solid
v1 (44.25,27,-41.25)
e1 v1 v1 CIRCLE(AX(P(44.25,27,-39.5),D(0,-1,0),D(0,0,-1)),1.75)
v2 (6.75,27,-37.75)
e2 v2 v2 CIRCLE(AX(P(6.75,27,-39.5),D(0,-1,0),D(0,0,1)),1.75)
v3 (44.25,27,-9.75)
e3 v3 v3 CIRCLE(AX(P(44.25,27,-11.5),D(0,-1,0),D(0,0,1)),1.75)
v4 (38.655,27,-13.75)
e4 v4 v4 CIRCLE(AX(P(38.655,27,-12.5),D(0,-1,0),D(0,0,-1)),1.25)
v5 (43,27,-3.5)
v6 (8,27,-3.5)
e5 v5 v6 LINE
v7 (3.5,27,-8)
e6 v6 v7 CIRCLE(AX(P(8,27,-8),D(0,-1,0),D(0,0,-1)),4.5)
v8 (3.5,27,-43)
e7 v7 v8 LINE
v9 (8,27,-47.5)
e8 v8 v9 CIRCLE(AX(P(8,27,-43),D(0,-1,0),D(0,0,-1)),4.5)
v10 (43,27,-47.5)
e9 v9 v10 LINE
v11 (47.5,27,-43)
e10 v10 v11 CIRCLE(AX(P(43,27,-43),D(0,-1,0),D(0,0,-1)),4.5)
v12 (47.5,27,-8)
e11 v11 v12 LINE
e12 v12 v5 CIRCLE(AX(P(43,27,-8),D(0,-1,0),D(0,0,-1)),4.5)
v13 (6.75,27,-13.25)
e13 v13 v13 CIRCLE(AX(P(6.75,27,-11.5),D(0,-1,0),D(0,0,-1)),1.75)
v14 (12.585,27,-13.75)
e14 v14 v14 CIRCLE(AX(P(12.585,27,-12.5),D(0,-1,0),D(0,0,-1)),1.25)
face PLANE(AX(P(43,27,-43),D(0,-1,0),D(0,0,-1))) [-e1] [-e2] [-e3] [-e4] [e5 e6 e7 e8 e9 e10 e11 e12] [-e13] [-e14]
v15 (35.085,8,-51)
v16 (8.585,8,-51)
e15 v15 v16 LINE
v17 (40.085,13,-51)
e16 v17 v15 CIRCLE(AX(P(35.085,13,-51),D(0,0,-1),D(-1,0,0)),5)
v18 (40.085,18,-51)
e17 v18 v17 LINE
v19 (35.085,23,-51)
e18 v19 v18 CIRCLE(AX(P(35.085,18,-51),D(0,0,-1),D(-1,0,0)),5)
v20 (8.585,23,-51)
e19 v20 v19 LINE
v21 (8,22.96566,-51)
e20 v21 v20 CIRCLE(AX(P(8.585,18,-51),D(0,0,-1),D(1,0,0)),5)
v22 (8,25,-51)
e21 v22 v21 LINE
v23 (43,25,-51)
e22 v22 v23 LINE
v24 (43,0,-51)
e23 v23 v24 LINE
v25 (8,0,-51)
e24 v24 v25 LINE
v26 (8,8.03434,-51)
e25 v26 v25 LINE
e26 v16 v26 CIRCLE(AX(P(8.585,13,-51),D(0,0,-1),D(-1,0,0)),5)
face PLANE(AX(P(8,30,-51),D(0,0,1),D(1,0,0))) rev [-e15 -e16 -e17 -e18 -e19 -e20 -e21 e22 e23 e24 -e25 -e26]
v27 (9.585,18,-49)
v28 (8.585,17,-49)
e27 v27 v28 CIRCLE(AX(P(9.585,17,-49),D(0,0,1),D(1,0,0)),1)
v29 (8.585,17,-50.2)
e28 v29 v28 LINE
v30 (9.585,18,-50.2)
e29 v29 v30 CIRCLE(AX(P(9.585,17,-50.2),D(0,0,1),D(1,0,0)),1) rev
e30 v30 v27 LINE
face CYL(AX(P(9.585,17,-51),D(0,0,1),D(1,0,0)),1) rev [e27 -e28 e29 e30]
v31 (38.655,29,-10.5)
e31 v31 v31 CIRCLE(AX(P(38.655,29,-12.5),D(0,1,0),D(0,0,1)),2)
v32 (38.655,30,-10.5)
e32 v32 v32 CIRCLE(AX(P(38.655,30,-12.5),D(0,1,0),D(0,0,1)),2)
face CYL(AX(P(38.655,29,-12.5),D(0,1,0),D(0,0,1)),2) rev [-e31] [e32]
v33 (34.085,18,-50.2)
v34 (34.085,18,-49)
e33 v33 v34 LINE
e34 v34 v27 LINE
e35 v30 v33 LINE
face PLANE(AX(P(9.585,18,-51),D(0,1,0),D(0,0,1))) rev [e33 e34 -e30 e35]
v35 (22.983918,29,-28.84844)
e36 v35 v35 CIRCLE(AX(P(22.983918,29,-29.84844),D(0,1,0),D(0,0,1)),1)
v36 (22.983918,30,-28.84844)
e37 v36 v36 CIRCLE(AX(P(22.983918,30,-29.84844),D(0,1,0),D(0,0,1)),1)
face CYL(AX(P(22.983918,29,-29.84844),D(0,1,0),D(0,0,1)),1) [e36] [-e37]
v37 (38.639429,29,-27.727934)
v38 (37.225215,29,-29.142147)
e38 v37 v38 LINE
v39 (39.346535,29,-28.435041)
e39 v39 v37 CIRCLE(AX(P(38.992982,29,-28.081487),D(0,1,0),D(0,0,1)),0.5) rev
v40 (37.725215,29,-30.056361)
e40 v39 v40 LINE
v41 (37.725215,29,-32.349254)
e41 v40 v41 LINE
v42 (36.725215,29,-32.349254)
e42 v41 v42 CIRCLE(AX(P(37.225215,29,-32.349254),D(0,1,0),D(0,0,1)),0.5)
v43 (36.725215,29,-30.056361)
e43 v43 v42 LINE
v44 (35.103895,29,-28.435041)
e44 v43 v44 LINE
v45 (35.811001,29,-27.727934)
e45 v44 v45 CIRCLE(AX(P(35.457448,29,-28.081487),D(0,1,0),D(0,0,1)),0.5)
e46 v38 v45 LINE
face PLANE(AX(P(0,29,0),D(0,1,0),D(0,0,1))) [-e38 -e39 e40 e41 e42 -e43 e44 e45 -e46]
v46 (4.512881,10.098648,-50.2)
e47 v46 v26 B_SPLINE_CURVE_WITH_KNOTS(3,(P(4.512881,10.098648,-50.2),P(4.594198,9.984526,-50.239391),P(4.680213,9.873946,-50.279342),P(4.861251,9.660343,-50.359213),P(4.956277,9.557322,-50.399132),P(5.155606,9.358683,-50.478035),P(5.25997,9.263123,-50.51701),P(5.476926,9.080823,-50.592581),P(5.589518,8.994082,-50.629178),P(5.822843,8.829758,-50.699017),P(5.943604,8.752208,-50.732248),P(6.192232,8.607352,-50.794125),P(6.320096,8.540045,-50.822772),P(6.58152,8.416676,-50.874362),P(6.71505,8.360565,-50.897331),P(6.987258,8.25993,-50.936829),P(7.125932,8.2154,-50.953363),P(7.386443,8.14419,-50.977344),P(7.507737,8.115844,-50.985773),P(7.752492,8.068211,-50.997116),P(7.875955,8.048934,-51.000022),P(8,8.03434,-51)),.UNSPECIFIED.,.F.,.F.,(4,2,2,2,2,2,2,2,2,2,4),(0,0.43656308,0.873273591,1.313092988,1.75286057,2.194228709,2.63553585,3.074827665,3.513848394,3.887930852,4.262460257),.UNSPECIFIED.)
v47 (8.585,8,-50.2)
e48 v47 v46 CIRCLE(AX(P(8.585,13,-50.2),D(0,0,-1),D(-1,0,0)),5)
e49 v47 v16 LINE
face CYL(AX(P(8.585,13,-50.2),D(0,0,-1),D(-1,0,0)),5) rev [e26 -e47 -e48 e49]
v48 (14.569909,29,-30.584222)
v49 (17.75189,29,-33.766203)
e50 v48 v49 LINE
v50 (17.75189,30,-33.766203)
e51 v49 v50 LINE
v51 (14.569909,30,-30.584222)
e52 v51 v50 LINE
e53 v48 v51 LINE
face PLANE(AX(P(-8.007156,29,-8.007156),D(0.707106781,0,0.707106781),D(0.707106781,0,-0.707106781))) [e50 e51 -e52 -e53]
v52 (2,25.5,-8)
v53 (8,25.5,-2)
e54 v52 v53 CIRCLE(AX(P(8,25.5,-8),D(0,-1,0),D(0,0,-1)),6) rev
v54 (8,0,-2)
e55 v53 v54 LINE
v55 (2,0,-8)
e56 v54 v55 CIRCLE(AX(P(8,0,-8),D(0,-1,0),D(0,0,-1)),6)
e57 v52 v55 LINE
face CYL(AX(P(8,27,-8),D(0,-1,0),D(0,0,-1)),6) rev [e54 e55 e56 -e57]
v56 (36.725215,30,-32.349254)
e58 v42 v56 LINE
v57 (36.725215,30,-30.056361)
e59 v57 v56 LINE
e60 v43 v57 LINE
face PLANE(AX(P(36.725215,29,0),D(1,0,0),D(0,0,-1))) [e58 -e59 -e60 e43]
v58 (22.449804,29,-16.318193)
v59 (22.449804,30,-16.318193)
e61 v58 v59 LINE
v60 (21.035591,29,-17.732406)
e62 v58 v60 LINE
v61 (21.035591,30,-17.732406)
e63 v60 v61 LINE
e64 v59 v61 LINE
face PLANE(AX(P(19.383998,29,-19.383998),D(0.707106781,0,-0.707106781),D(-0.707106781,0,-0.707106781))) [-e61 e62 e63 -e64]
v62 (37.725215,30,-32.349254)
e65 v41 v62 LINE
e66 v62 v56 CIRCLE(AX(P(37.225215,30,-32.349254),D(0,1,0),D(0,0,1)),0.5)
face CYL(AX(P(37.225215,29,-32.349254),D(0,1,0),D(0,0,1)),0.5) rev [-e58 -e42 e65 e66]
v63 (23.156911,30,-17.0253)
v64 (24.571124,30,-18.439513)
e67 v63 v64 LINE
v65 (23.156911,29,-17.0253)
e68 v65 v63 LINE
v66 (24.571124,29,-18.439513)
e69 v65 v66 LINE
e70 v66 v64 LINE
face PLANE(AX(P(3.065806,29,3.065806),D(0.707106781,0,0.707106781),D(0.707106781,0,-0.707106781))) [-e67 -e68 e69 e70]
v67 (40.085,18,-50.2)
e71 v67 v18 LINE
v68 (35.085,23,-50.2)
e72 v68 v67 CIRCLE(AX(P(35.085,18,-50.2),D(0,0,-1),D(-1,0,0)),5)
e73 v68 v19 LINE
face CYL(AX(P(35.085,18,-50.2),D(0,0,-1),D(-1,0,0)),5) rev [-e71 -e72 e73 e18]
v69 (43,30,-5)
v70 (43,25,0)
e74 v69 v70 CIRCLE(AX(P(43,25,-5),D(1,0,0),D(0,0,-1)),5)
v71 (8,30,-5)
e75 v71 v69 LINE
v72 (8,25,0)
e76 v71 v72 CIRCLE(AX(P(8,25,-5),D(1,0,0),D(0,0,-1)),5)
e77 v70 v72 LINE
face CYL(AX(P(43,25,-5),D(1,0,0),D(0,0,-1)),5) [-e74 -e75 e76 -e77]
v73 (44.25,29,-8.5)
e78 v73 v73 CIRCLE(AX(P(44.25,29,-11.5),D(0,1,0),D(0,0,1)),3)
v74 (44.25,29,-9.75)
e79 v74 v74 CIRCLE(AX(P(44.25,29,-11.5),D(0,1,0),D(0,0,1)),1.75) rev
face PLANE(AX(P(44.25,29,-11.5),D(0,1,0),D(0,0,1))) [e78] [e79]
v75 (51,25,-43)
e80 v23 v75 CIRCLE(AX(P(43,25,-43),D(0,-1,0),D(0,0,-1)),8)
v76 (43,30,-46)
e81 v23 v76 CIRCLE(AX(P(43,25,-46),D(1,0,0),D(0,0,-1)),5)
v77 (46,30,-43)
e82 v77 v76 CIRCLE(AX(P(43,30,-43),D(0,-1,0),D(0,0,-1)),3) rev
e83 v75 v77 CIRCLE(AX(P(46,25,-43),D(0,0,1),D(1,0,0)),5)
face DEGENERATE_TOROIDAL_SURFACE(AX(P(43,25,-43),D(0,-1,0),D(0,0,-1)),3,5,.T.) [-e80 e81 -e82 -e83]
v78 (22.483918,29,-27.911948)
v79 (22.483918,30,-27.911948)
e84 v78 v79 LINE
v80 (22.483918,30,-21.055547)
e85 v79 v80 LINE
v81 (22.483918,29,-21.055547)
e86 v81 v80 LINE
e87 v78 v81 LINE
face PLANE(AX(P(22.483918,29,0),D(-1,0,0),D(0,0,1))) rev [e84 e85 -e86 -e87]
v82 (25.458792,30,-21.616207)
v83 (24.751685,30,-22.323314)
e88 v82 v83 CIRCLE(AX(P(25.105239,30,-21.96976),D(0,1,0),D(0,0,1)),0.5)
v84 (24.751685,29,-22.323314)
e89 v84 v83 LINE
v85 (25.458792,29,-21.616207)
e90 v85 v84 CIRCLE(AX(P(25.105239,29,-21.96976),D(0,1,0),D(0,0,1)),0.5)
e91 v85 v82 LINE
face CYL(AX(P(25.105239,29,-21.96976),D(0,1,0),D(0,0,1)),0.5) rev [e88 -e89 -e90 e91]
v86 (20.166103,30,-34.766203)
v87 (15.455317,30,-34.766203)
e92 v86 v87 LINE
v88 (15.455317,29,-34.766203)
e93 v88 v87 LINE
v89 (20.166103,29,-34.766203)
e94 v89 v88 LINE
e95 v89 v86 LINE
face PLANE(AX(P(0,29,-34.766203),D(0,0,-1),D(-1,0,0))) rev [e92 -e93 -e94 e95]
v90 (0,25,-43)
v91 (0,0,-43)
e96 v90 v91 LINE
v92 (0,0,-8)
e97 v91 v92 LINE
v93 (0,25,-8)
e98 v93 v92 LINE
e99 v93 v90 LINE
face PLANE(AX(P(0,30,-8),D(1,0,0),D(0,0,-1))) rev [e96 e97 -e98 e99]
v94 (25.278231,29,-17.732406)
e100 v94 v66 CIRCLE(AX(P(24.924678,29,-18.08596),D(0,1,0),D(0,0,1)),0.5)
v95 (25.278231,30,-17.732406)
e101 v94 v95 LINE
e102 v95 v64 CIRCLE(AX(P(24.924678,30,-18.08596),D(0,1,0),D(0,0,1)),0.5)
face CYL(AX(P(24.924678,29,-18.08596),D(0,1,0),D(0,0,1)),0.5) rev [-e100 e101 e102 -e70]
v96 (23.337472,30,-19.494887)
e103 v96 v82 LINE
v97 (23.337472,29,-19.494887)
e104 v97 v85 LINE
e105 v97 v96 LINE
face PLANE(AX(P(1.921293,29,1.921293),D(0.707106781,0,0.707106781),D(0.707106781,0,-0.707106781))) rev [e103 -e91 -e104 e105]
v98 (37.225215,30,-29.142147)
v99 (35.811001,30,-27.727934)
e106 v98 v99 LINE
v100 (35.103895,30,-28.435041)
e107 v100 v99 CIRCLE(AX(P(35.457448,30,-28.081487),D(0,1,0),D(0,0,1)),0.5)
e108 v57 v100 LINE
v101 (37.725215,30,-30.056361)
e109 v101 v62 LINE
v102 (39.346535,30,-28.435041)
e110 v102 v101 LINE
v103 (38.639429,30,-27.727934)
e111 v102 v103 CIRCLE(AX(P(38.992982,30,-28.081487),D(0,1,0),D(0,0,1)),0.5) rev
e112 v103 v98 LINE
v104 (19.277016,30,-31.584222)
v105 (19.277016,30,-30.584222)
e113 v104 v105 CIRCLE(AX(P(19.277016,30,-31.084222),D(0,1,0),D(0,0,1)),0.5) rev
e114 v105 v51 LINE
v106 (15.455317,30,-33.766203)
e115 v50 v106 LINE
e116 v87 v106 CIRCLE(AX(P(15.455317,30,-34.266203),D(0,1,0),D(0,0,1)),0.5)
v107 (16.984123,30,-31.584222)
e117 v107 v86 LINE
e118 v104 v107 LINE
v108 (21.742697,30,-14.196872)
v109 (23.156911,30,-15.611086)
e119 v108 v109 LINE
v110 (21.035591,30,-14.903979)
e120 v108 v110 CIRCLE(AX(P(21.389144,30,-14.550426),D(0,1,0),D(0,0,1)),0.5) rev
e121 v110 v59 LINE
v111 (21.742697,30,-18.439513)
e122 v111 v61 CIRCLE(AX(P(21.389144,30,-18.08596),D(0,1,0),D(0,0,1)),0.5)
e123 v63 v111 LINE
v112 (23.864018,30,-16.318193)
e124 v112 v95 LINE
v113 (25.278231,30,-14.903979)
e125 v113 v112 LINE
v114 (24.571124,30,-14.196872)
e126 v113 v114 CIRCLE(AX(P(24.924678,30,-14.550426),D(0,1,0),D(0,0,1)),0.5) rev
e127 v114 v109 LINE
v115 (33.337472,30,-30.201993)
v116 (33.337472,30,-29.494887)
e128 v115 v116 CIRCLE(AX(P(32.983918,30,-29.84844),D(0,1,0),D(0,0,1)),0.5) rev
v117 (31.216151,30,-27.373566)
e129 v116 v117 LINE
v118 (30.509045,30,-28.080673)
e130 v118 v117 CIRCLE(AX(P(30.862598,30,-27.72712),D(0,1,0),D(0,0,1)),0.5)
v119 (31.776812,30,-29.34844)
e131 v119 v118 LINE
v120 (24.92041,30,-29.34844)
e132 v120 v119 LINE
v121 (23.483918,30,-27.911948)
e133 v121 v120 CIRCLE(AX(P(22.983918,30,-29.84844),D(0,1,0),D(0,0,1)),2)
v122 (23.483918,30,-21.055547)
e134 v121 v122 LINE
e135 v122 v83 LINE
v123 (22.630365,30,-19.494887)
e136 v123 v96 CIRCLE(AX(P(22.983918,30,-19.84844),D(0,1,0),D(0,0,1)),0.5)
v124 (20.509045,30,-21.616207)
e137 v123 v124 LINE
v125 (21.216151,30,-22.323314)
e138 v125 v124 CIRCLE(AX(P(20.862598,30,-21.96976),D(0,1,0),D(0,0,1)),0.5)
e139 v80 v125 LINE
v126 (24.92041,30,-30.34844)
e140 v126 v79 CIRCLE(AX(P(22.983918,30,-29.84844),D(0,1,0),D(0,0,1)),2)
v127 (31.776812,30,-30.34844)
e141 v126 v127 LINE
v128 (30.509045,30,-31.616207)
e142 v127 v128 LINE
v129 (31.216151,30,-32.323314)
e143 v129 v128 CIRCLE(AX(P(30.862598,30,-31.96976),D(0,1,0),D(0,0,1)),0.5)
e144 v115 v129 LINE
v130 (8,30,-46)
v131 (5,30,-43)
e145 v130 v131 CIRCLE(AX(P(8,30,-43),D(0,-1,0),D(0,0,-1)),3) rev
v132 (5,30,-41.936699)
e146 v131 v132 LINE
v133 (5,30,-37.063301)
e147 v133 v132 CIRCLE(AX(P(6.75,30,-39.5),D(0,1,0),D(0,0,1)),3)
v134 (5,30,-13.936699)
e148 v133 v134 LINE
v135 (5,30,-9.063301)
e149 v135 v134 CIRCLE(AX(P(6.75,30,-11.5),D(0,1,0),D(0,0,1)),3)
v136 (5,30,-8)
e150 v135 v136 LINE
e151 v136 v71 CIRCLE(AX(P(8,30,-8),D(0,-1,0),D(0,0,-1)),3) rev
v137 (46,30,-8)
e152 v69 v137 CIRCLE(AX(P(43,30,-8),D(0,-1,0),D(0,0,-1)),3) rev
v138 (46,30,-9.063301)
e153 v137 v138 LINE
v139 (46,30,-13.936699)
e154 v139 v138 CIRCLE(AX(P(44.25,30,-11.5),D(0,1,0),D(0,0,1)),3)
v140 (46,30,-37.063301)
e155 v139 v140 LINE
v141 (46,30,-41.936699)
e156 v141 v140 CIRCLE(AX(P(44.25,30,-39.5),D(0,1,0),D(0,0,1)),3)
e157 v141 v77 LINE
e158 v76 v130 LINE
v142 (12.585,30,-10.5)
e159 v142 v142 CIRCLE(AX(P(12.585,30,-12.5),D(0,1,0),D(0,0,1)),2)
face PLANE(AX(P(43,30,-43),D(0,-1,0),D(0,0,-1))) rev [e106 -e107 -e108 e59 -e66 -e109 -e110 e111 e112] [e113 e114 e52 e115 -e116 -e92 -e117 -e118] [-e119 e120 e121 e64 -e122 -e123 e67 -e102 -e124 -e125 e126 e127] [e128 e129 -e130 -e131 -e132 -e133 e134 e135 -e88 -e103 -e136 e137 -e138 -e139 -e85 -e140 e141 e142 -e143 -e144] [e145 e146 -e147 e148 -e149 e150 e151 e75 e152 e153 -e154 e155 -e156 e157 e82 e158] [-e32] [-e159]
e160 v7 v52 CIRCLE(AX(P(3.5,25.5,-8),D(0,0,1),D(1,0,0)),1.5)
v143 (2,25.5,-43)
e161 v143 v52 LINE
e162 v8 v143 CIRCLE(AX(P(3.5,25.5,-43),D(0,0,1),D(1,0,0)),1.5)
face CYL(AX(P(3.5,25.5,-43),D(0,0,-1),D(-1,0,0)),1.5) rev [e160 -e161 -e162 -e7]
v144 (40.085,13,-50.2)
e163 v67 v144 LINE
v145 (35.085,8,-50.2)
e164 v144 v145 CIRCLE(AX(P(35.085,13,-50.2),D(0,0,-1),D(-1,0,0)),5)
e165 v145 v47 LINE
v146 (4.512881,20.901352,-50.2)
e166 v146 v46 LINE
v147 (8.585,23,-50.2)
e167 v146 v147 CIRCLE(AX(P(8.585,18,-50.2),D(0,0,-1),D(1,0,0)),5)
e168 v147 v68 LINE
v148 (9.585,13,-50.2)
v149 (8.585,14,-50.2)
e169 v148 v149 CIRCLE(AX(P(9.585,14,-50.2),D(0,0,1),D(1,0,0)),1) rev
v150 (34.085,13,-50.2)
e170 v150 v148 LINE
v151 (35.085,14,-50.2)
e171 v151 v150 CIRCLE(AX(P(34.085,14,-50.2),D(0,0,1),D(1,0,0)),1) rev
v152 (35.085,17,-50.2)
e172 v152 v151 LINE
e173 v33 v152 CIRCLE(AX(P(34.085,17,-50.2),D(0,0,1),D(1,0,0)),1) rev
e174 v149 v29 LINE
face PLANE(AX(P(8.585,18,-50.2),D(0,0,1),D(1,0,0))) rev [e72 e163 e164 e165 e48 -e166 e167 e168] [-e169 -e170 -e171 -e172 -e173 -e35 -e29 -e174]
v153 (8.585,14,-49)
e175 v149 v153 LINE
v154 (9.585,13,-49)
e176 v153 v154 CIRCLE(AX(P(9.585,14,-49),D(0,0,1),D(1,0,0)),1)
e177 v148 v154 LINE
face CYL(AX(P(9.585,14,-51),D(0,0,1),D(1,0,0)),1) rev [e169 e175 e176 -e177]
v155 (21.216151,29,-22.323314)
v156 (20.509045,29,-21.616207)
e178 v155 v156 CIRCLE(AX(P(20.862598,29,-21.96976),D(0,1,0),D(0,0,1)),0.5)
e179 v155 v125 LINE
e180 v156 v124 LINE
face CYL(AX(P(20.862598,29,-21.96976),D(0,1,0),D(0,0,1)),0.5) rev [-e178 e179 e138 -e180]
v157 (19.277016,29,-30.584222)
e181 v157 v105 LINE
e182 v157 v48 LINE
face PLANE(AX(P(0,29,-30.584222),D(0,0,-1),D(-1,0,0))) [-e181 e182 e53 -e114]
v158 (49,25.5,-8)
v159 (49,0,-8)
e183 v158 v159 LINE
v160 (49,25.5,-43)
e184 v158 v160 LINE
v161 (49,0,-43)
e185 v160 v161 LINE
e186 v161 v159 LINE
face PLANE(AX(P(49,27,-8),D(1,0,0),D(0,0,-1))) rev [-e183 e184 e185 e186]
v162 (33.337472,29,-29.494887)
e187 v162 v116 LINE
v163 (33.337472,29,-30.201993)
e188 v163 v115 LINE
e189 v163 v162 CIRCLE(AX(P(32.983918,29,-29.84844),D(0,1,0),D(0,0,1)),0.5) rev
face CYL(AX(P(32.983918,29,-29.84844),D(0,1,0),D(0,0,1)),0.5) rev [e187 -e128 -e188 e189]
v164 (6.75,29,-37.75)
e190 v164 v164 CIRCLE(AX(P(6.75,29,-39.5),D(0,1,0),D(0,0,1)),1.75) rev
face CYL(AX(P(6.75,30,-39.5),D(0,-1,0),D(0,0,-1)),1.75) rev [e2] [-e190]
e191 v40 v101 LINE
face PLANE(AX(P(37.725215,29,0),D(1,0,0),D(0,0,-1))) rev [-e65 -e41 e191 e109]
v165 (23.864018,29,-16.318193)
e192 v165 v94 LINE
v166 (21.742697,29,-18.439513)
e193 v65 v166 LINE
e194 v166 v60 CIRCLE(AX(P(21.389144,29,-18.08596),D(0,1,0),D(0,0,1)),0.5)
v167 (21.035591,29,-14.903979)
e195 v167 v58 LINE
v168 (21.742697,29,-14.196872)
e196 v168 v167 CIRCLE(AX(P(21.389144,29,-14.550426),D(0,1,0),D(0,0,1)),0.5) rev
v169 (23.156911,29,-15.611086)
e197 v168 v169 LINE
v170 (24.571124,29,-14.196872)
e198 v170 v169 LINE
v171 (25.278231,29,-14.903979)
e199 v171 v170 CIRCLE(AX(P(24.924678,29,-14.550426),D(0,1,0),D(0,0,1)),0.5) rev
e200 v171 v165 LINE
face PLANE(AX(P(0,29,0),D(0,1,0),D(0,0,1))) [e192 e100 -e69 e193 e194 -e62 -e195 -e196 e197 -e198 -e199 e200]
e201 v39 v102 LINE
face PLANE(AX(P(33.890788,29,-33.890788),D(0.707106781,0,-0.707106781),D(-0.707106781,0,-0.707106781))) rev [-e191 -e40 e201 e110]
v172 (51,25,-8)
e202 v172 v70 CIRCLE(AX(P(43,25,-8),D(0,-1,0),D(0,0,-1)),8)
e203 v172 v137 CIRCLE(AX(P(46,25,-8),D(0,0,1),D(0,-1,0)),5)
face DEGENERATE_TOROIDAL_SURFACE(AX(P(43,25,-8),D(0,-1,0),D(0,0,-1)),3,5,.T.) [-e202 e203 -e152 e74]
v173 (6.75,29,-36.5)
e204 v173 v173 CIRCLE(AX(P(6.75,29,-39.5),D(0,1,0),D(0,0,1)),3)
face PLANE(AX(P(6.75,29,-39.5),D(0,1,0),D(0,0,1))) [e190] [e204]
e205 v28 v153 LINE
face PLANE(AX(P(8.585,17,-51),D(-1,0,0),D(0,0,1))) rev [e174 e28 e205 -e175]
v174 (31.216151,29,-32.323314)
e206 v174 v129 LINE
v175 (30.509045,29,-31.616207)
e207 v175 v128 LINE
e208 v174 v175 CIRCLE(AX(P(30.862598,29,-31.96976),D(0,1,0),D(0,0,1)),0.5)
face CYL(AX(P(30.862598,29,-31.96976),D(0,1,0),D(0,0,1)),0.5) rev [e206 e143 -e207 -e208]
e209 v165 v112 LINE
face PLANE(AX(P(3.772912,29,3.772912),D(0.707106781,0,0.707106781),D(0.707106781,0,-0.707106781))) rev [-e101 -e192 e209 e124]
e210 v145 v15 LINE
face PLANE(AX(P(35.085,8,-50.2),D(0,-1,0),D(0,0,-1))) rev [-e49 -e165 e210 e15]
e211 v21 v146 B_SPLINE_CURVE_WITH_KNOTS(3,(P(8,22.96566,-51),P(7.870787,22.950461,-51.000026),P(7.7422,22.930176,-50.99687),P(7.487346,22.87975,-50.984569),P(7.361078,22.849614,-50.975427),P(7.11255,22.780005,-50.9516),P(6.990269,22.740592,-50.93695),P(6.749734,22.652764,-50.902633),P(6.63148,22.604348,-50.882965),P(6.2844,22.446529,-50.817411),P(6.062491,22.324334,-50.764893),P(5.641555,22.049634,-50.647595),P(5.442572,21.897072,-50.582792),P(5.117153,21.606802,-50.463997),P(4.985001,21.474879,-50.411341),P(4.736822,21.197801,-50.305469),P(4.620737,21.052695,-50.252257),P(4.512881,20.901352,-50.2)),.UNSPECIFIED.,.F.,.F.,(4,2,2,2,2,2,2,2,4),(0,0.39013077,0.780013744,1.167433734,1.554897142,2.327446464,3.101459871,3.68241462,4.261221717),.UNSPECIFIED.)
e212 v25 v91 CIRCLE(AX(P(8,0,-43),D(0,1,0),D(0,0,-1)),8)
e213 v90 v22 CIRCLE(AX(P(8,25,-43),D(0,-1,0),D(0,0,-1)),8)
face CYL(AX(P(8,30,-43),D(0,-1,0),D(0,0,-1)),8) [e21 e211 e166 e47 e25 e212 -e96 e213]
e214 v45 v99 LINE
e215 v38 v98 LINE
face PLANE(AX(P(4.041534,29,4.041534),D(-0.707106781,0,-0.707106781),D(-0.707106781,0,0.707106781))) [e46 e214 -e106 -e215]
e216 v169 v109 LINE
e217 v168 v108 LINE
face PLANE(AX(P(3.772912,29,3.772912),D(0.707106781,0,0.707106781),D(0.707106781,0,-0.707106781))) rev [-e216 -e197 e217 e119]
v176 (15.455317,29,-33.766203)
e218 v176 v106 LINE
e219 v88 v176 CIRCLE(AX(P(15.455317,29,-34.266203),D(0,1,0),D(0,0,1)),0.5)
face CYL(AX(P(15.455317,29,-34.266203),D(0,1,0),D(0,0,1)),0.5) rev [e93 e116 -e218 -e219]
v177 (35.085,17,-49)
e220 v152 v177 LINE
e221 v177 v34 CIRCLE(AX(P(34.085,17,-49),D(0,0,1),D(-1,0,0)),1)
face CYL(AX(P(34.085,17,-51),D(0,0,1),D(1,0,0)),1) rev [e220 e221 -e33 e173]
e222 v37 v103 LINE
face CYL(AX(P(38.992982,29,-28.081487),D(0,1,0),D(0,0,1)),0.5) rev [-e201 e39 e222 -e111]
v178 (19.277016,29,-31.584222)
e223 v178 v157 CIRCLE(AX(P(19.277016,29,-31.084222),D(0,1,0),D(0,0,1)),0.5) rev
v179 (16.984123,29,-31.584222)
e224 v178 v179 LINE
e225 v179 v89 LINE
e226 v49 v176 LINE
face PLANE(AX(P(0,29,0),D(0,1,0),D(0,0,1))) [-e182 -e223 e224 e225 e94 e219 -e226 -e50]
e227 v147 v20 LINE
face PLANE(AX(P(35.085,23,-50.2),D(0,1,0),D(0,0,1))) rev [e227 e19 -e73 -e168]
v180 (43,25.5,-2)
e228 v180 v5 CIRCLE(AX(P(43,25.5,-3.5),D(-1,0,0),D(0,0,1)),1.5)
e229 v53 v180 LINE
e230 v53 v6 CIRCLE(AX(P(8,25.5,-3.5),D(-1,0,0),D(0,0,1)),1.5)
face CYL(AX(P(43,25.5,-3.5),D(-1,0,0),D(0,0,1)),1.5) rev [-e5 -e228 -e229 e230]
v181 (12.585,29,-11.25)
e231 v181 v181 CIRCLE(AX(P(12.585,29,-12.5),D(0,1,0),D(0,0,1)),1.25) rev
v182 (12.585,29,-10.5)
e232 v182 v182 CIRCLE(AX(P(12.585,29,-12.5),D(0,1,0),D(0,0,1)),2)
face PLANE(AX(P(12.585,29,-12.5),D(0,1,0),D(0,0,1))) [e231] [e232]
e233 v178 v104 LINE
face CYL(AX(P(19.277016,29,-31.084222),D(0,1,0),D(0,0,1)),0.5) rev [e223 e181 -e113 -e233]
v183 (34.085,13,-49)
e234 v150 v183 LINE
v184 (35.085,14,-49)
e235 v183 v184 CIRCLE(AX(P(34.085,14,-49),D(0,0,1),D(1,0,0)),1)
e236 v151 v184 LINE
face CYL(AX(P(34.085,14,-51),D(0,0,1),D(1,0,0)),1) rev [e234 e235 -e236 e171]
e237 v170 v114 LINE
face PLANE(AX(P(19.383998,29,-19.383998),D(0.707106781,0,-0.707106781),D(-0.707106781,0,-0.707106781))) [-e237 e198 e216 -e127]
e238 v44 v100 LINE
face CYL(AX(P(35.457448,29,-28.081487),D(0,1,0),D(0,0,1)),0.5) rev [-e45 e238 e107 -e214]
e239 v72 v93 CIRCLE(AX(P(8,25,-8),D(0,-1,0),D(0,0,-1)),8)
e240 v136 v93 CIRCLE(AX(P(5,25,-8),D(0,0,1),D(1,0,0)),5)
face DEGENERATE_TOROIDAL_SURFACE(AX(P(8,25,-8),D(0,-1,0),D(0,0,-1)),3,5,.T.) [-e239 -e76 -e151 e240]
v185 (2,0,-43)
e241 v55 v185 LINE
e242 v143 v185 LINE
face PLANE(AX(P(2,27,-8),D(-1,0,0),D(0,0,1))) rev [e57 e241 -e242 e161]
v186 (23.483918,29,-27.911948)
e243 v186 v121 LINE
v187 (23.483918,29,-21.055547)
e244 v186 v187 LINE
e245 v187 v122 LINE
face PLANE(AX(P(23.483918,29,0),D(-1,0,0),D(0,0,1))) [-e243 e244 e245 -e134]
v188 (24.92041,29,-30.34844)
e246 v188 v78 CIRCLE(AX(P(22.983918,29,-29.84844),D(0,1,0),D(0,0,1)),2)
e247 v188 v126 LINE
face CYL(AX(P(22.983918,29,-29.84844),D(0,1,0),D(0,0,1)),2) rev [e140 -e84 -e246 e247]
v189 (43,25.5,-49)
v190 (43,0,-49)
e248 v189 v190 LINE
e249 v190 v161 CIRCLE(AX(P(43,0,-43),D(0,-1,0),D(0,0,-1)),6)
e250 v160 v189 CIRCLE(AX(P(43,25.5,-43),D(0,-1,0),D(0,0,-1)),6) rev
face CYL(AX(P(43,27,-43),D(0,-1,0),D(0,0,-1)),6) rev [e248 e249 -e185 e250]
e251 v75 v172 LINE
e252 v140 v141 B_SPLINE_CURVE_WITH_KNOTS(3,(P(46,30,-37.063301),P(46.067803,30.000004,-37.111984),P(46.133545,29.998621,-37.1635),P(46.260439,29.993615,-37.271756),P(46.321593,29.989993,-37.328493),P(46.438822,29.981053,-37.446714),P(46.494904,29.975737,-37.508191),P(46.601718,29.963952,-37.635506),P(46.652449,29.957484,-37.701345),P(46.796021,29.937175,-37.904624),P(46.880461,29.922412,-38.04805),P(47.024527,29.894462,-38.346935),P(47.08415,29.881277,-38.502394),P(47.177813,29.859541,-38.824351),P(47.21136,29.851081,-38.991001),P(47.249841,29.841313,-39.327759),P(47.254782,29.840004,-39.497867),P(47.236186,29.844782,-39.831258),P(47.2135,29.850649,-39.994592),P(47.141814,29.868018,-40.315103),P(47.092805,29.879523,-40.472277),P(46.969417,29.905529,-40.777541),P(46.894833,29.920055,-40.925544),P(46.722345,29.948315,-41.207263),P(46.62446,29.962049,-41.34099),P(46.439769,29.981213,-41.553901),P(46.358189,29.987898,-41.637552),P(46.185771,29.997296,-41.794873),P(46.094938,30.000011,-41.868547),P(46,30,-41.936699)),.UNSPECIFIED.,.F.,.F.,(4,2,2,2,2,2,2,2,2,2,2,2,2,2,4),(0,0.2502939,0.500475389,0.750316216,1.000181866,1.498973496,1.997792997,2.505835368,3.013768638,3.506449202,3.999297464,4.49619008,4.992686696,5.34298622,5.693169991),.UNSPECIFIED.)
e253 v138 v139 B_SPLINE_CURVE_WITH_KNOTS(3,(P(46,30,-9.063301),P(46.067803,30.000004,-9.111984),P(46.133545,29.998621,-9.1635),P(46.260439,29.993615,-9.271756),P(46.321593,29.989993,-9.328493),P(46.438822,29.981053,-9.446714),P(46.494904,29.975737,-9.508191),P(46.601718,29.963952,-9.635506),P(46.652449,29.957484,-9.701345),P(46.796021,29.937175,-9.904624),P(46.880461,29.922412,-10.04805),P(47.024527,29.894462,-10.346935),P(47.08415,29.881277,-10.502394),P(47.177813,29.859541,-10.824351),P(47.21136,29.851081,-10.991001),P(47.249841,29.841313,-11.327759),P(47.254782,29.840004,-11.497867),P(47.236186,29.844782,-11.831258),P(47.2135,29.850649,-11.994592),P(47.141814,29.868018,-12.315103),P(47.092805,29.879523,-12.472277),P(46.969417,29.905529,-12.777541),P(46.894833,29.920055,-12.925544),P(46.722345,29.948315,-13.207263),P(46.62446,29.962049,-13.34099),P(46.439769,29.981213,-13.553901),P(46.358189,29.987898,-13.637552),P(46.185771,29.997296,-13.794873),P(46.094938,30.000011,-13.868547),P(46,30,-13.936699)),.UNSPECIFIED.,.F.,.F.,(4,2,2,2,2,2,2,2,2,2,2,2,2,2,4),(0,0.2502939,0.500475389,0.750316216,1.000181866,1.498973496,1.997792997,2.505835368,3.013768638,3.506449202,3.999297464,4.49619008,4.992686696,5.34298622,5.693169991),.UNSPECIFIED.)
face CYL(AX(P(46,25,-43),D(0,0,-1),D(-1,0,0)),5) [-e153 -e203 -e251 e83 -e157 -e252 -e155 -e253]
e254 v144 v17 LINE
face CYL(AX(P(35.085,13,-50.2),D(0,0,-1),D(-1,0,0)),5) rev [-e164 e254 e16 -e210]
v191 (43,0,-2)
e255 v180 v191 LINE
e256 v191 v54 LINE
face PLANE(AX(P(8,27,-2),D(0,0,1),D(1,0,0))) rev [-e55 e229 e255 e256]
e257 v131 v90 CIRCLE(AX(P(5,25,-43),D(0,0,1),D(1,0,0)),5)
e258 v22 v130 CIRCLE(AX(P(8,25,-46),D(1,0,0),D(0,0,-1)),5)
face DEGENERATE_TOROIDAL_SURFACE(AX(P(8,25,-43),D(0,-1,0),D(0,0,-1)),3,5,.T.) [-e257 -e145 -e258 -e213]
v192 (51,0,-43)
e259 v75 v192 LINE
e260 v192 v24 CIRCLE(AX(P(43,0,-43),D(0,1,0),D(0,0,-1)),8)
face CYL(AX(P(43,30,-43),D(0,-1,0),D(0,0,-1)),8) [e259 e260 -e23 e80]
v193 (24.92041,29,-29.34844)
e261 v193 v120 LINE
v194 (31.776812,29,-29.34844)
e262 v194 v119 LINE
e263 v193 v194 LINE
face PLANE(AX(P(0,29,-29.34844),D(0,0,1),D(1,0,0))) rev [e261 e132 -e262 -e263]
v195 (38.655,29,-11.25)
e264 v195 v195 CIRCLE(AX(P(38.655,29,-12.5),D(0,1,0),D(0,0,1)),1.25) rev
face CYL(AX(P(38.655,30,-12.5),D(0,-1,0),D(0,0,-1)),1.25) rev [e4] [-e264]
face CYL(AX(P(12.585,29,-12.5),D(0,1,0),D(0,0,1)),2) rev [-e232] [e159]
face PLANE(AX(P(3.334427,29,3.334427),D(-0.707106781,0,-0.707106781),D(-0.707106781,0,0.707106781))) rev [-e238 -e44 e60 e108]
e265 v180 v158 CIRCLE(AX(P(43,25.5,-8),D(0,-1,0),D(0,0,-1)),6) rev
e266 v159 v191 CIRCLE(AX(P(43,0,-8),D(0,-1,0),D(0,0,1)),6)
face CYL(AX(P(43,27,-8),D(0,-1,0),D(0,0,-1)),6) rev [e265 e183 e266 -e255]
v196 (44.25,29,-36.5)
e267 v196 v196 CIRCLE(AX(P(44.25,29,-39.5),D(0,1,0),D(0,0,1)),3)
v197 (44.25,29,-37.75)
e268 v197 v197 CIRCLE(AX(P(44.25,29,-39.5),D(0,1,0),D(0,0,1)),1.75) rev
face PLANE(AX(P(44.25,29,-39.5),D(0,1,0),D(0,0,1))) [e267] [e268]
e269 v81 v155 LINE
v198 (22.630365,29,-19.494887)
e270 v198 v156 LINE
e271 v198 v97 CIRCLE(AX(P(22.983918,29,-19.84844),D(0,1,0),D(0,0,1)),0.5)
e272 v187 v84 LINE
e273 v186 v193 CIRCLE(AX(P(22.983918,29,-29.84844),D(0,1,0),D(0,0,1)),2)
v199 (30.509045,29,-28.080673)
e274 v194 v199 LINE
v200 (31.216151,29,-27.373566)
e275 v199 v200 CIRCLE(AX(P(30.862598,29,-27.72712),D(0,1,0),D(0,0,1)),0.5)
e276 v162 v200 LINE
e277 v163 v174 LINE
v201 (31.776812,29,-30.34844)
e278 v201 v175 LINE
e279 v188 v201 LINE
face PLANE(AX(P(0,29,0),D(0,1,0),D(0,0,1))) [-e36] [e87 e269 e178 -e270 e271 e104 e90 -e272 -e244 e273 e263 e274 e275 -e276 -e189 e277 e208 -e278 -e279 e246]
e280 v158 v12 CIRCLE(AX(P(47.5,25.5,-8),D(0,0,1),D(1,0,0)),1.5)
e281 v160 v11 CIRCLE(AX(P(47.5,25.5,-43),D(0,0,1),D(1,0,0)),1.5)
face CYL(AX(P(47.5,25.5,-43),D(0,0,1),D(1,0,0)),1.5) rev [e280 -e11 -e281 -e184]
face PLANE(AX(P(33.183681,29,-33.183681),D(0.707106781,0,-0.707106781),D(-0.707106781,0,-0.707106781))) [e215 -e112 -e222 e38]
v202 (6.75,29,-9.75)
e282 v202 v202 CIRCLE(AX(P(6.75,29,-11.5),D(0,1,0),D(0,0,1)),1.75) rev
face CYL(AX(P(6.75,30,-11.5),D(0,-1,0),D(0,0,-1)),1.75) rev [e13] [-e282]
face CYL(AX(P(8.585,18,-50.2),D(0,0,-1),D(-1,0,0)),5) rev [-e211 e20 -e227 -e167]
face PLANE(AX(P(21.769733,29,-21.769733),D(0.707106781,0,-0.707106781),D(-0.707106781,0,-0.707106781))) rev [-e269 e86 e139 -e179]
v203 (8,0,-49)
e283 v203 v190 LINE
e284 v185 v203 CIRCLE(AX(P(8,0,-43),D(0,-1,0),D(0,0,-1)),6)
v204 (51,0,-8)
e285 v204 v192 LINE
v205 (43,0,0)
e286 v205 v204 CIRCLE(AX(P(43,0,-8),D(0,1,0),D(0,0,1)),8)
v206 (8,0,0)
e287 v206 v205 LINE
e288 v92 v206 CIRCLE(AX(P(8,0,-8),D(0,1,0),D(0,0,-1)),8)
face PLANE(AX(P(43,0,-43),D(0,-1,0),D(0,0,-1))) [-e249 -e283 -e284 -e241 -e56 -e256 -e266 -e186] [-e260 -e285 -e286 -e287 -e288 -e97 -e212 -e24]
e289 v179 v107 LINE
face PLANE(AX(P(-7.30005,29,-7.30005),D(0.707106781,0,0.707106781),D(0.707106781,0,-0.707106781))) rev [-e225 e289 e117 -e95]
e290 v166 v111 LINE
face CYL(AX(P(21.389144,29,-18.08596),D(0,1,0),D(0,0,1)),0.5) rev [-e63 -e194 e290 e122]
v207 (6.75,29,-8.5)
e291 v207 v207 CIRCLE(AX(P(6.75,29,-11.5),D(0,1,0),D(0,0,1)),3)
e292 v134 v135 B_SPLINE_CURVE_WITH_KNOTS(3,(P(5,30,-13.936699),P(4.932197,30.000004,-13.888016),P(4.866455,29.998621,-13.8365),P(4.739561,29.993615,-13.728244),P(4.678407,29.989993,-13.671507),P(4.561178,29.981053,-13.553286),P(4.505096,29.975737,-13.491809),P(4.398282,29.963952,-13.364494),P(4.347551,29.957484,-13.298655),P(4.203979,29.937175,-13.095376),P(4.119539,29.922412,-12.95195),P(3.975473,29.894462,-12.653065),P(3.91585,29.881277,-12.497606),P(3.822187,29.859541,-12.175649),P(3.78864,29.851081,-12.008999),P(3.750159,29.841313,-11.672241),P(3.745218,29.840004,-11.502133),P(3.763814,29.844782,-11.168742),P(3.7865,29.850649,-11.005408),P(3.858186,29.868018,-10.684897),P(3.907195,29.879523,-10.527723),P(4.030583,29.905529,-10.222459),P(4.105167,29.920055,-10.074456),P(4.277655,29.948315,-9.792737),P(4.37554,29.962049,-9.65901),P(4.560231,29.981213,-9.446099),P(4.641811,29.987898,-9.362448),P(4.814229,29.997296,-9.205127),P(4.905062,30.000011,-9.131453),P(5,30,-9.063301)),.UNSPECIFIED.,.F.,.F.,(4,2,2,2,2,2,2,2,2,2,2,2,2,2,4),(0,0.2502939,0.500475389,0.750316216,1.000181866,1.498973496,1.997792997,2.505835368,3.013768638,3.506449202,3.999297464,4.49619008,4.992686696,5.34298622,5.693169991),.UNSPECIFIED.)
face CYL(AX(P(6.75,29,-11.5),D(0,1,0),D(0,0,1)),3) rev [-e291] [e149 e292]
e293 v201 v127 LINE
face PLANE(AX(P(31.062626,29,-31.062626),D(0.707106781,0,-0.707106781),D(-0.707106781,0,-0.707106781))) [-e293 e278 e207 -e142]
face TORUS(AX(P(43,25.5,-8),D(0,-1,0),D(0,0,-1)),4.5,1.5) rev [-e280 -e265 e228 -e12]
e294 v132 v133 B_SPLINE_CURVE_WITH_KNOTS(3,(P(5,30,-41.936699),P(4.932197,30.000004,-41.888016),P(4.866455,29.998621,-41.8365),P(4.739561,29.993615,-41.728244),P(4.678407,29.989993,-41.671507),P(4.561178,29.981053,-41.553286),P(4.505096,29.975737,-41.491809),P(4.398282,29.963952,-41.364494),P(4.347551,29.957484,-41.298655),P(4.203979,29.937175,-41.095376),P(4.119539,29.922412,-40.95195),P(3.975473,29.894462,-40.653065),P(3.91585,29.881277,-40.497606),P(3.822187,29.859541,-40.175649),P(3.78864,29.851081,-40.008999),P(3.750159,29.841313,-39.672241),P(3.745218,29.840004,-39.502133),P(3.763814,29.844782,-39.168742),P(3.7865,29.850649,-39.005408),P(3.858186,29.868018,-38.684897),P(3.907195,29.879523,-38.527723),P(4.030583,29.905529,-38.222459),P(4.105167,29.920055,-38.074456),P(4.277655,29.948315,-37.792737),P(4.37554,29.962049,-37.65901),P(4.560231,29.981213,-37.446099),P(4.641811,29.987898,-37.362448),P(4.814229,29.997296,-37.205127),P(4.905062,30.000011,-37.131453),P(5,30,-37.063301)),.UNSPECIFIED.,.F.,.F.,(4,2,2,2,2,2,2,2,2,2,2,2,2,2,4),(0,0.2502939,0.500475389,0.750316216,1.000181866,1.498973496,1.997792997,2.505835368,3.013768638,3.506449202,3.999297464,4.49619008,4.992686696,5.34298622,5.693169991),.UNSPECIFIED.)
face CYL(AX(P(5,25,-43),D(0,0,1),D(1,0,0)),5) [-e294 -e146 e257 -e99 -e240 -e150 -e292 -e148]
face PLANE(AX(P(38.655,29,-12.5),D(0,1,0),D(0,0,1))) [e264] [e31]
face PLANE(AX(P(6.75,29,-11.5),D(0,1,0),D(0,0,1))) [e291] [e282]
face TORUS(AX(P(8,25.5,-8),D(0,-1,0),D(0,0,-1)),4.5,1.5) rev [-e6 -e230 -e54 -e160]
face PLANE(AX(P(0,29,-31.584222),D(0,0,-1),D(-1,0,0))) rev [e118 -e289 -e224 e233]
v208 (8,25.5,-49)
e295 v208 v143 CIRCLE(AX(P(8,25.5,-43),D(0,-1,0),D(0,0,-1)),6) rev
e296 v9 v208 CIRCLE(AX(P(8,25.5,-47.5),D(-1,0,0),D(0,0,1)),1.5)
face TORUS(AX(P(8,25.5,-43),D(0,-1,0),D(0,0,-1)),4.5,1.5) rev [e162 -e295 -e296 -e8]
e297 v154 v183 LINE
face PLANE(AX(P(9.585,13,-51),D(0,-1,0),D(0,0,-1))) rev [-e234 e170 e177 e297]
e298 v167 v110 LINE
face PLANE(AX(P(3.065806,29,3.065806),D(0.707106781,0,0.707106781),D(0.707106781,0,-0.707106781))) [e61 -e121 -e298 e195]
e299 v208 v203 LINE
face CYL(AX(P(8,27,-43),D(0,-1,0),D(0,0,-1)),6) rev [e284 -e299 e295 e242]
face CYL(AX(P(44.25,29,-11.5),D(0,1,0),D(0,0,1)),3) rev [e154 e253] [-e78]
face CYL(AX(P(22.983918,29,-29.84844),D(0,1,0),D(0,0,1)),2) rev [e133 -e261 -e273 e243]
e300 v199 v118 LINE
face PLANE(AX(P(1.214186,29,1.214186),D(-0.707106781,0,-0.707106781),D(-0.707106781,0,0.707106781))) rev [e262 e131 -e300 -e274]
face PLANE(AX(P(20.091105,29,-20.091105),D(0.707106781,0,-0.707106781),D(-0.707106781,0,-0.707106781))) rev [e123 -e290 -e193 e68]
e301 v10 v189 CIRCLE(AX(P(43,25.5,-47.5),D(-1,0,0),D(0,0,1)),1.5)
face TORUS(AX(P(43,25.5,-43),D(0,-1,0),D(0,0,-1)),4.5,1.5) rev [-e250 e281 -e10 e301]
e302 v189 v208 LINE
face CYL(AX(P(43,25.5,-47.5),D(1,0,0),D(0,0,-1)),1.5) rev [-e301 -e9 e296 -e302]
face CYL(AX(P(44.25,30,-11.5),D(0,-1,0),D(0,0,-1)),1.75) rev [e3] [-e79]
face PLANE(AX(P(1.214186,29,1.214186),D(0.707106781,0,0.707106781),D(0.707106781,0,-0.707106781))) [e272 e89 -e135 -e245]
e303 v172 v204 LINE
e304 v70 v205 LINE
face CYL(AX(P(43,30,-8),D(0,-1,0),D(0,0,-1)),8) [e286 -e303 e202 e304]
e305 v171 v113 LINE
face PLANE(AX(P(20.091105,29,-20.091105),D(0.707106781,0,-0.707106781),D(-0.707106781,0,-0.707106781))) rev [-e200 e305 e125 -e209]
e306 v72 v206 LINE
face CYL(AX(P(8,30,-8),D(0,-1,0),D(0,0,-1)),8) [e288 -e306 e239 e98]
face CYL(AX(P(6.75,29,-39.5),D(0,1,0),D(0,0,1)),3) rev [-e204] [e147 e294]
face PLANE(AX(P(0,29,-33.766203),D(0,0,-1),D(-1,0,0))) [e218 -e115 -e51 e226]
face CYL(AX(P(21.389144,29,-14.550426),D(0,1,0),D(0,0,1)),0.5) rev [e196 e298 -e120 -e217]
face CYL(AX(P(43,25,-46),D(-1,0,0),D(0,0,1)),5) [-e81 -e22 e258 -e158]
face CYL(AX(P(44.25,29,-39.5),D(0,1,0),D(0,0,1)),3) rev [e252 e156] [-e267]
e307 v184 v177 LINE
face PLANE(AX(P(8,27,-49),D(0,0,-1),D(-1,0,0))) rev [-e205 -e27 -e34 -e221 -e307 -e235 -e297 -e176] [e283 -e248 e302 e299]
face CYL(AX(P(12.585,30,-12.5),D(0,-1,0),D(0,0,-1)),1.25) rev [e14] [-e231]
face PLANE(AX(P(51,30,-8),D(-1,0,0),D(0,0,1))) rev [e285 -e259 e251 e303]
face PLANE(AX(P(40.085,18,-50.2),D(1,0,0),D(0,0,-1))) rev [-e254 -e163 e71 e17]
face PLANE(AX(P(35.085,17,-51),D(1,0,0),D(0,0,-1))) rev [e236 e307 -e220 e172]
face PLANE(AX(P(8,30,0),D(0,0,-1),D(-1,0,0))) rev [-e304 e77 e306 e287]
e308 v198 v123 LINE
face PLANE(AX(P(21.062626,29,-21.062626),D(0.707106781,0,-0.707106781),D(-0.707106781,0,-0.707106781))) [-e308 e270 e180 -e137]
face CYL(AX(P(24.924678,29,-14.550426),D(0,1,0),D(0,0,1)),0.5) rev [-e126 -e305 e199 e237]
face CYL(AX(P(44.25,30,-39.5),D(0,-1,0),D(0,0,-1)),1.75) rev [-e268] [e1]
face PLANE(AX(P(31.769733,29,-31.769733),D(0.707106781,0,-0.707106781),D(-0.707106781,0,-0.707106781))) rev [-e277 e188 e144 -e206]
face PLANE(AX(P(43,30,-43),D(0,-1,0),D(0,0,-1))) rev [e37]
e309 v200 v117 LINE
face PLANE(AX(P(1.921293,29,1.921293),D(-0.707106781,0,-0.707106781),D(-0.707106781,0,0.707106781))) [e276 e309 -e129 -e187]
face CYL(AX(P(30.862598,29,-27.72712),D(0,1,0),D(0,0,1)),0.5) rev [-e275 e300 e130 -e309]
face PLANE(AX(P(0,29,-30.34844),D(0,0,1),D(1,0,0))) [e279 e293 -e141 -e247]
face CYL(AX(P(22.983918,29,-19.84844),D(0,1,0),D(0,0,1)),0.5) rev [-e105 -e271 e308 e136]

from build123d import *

# Parameters (mm, degrees)
BOSS_EXTRUDE1_DEPTH = 30
CUT_EXTRUDE1_DEPTH  = 27
SKETCH3_R           = 1.75
SKETCH3_R_2         = 1.25
CUT_EXTRUDE2_DEPTH  = 3
SKETCH4_R           = 3
SKETCH4_R_2         = 2
CUT_EXTRUDE3_DEPTH  = 1
CUT_EXTRUDE4_DEPTH  = 2
FILLET1_R           = 5
FILLET2_R           = 1.5
SKETCH6_R           = 1
CUT_EXTRUDE5_DEPTH  = 1
CUT_EXTRUDE6_DEPTH  = 0.8


with BuildPart() as part:
    # Sketch1 → Boss-Extrude1 (new body)
    with BuildSketch(Plane(origin=(0, 0, 0), x_dir=(1, 0, 0), z_dir=(0, 1, 0))):
        with BuildLine():
            Line((8, 0), (43, 0))
            ThreePointArc((43, 0), (48.656854249, 2.343145751), (51, 8))
            Line((51, 8), (51, 43))
            ThreePointArc((51, 43), (48.656854249, 48.656854249), (43, 51))
            Line((43, 51), (8, 51))
            ThreePointArc((8, 51), (2.343145751, 48.656854249), (0, 43))
            Line((0, 43), (0, 8))
            ThreePointArc((0, 8), (2.343145751, 2.343145751), (8, 0))
        make_face()
    extrude(amount=BOSS_EXTRUDE1_DEPTH)

    # Sketch2 → Cut-Extrude1 (cut)
    with BuildSketch(Plane.XZ):
        with BuildLine():
            Line((8, -2), (43, -2))
            ThreePointArc((43, -2), (47.242640687, -3.757359313), (49, -8))
            Line((49, -8), (49, -43))
            ThreePointArc((49, -43), (47.242640687, -47.242640687), (43, -49))
            Line((43, -49), (8, -49))
            ThreePointArc((8, -49), (3.757359313, -47.242640687), (2, -43))
            Line((2, -43), (2, -8))
            ThreePointArc((2, -8), (3.757359313, -3.757359313), (8, -2))
        make_face()
    extrude(amount=-CUT_EXTRUDE1_DEPTH, mode=Mode.SUBTRACT)

    # Sketch3 → Cut-Extrude2 (cut)
    with BuildSketch(Plane.XZ.offset(-27)):
        with Locations(Location((6.75, -11.5, 0), (0, 0, 270))):
            Circle(SKETCH3_R)
        with Locations(Location((44.25, -11.5, 0), (0, 0, 90))):
            Circle(SKETCH3_R)
        with Locations(Location((44.25, -39.5, 0), (0, 0, 270))):
            Circle(SKETCH3_R)
        with Locations(Location((6.75, -39.5, 0), (0, 0, 90))):
            Circle(SKETCH3_R)
        with Locations(Location((38.655, -12.5, 0), (0, 0, 270))):
            Circle(SKETCH3_R_2)
        with Locations(Location((12.585, -12.5, 0), (0, 0, 270))):
            Circle(SKETCH3_R_2)
    extrude(amount=-CUT_EXTRUDE2_DEPTH, mode=Mode.SUBTRACT)

    # Sketch4 → Cut-Extrude3 (cut)
    with BuildSketch(Plane(origin=(0, 30, 0), x_dir=(1, 0, 0), z_dir=(0, 1, 0))):
        with Locations(Location((44.25, 39.5, 0), (0, 0, 270))):
            Circle(SKETCH4_R)
        with Locations(Location((6.75, 39.5, 0), (0, 0, 270))):
            Circle(SKETCH4_R)
        with Locations(Location((6.75, 11.5, 0), (0, 0, 270))):
            Circle(SKETCH4_R)
        with Locations(Location((12.585, 12.5, 0), (0, 0, 270))):
            Circle(SKETCH4_R_2)
        with Locations(Location((38.655, 12.5, 0), (0, 0, 270))):
            Circle(SKETCH4_R_2)
        with Locations(Location((44.25, 11.5, 0), (0, 0, 270))):
            Circle(SKETCH4_R)
    extrude(amount=-CUT_EXTRUDE3_DEPTH, mode=Mode.SUBTRACT)

    # Sketch5 → Cut-Extrude4 (cut)
    with BuildSketch(Plane.XY.offset(-49)):
        with BuildLine():
            Line((9.585, 18), (34.085, 18))
            ThreePointArc((34.085, 18), (34.792106781, 17.707106781), (35.085, 17))
            Line((35.085, 17), (35.085, 14))
            ThreePointArc((35.085, 14), (34.792106781, 13.292893219), (34.085, 13))
            Line((34.085, 13), (9.585, 13))
            ThreePointArc((9.585, 13), (8.877893219, 13.292893219), (8.585, 14))
            Line((8.585, 14), (8.585, 17))
            ThreePointArc((8.585, 17), (8.877893219, 17.707106781), (9.585, 18))
        make_face()
    extrude(amount=-CUT_EXTRUDE4_DEPTH, mode=Mode.SUBTRACT)

    # Fillet1
    # the kernel refuses this fillet: 5 mm, written as the material it takes off along each edge
    with BuildSketch(Plane(origin=(8, 30, -43), x_dir=(0, 0, -1), z_dir=(1, 0, 0))) as fillet1_piece_1:
        with BuildLine():
            CenterArc((8 - FILLET1_R, -FILLET1_R), FILLET1_R, 0, 90)
            Line((8 - FILLET1_R, 0), (8, 0))
            Line((8, 0), (8, -FILLET1_R))
        make_face()
    revolve(axis=Axis((8, 30, -43), (0, 1, 0)), revolution_arc=90, mode=Mode.SUBTRACT)
    with BuildSketch(Plane(origin=(0, 30, -43), x_dir=(0, -1, 0), z_dir=(0, 0, 1))) as fillet1_piece_2:
        with BuildLine():
            CenterArc((FILLET1_R, FILLET1_R), FILLET1_R, 180, 90)
            Line((0, FILLET1_R), (0, 0))
            Line((0, 0), (FILLET1_R, 0))
        make_face()
    extrude(amount=35, mode=Mode.SUBTRACT)
    with BuildSketch(Plane(origin=(8, 30, -8), x_dir=(-1, 0, 0), z_dir=(0, 0, -1))) as fillet1_piece_3:
        with BuildLine():
            CenterArc((8 - FILLET1_R, -FILLET1_R), FILLET1_R, 0, 90)
            Line((8 - FILLET1_R, 0), (8, 0))
            Line((8, 0), (8, -FILLET1_R))
        make_face()
    revolve(axis=Axis((8, 30, -8), (0, 1, 0)), revolution_arc=90, mode=Mode.SUBTRACT)
    with BuildSketch(Plane(origin=(8, 30, 0), x_dir=(0, 0, -1), z_dir=(1, 0, 0)), Plane(origin=(51, 30, -8), x_dir=(-1, 0, 0), z_dir=(0, 0, -1)), Plane(origin=(43, 30, -51), x_dir=(0, 0, 1), z_dir=(-1, 0, 0))) as fillet1_piece_4:
        with BuildLine():
            CenterArc((FILLET1_R, -FILLET1_R), FILLET1_R, 90, 90)
            Line((0, -FILLET1_R), (0, 0))
            Line((0, 0), (FILLET1_R, 0))
        make_face()
    extrude(amount=35, mode=Mode.SUBTRACT)
    with BuildSketch(Plane(origin=(43, 30, -8), x_dir=(0, 0, 1), z_dir=(-1, 0, 0))) as fillet1_piece_5:
        with BuildLine():
            CenterArc((8 - FILLET1_R, -FILLET1_R), FILLET1_R, 0, 90)
            Line((8, -FILLET1_R), (8, 0))
            Line((8, 0), (8 - FILLET1_R, 0))
        make_face()
    revolve(axis=Axis((43, 30, -8), (0, 1, 0)), revolution_arc=90, mode=Mode.SUBTRACT)
    with BuildSketch(Plane(origin=(43, 30, -43), x_dir=(1, 0, 0), z_dir=(0, 0, 1))) as fillet1_piece_6:
        with BuildLine():
            CenterArc((8 - FILLET1_R, -FILLET1_R), FILLET1_R, 0, 90)
            Line((8, -FILLET1_R), (8, 0))
            Line((8, 0), (8 - FILLET1_R, 0))
        make_face()
    revolve(axis=Axis((43, 30, -43), (0, 1, 0)), revolution_arc=90, mode=Mode.SUBTRACT)

    # Fillet2
    fillet2_edges = [part.edges().sort_by_distance(p)[0] for p in [
        (47.242640687, 27, -47.242640687),
        (25.5, 27, -49),
        (3.757359313, 27, -47.242640687),
        (2, 27, -25.5),
        (3.757359313, 27, -3.757359313),
        (25.5, 27, -2),
        (47.242640687, 27, -3.757359313),
        (49, 27, -25.5),
    ]]
    fillet(fillet2_edges, radius=FILLET2_R)

    # Sketch6 → Cut-Extrude5 (cut)
    # profile 1 of 4: a face of its own
    with BuildSketch(Plane(origin=(0, 30, 0), x_dir=(1, 0, 0), z_dir=(0, 1, 0))):
        with BuildLine():
            Line((24.920410097, 30.348440054), (31.776811643, 30.348440054))
            Line((31.776811643, 30.348440054), (30.50904469, 31.616207007))
            ThreePointArc((30.50904469, 31.616207007), (30.50904469, 32.323313788), (31.216151471, 32.323313788))
            Line((31.216151471, 32.323313788), (33.337471815, 30.201993444))
            ThreePointArc((33.337471815, 30.201993444), (33.483918424, 29.848440054), (33.337471815, 29.494886663))
            Line((33.337471815, 29.494886663), (31.216151471, 27.37356632))
            ThreePointArc((31.216151471, 27.37356632), (30.50904469, 27.37356632), (30.50904469, 28.080673101))
            Line((30.50904469, 28.080673101), (31.776811643, 29.348440054))
            Line((31.776811643, 29.348440054), (24.920410097, 29.348440054))
            ThreePointArc((24.920410097, 29.348440054), (24.398131986, 28.434226491), (23.483918424, 27.911948381))
            Line((23.483918424, 27.911948381), (23.483918424, 21.055546835))
            Line((23.483918424, 21.055546835), (24.751685377, 22.323313788))
            ThreePointArc((24.751685377, 22.323313788), (25.458792158, 22.323313788), (25.458792158, 21.616207007))
            Line((25.458792158, 21.616207007), (23.337471815, 19.494886663))
            ThreePointArc((23.337471815, 19.494886663), (22.983918424, 19.348440054), (22.630365033, 19.494886663))
            Line((22.630365033, 19.494886663), (20.50904469, 21.616207007))
            ThreePointArc((20.50904469, 21.616207007), (20.50904469, 22.323313788), (21.216151471, 22.323313788))
            Line((21.216151471, 22.323313788), (22.483918424, 21.055546835))
            Line((22.483918424, 21.055546835), (22.483918424, 27.911948381))
            ThreePointArc((22.483918424, 27.911948381), (21.569704862, 31.262653616), (24.920410097, 30.348440054))
        make_face()
        with Locations(Location((22.983918424, 29.848440054, 0), (0, 0, 270))):
            Circle(SKETCH6_R, mode=Mode.SUBTRACT)
    # profile 2 of 4: a face of its own
    with BuildSketch(Plane(origin=(0, 30, 0), x_dir=(1, 0, 0), z_dir=(0, 1, 0))):
        with BuildLine():
            Line((20.166103424, 34.766202804), (15.455317355, 34.766202804))
            ThreePointArc((15.455317355, 34.766202804), (14.955317355, 34.266202804), (15.455317355, 33.766202804))
            Line((15.455317355, 33.766202804), (17.751889862, 33.766202804))
            Line((17.751889862, 33.766202804), (14.569909347, 30.584222289))
            Line((14.569909347, 30.584222289), (19.277016128, 30.584222289))
            ThreePointArc((19.277016128, 30.584222289), (19.777016128, 31.084222289), (19.277016128, 31.584222289))
            Line((19.277016128, 31.584222289), (16.984122909, 31.584222289))
            Line((16.984122909, 31.584222289), (20.166103424, 34.766202804))
        make_face()
    # profile 3 of 4: a face of its own
    with BuildSketch(Plane(origin=(0, 30, 0), x_dir=(1, 0, 0), z_dir=(0, 1, 0))):
        with BuildLine():
            Line((37.725215013, 30.056361033), (37.725215013, 32.349254251))
            ThreePointArc((37.725215013, 32.349254251), (37.225215013, 32.849254251), (36.725215013, 32.349254251))
            Line((36.725215013, 32.349254251), (36.725215013, 30.056361033))
            Line((36.725215013, 30.056361033), (35.103894669, 28.435040689))
            ThreePointArc((35.103894669, 28.435040689), (35.103894669, 27.727933908), (35.81100145, 27.727933908))
            Line((35.81100145, 27.727933908), (37.225215013, 29.14214747))
            Line((37.225215013, 29.14214747), (38.639428575, 27.727933908))
            ThreePointArc((38.639428575, 27.727933908), (39.346535356, 27.727933908), (39.346535356, 28.435040689))
            Line((39.346535356, 28.435040689), (37.725215013, 30.056361033))
        make_face()
    # profile 4 of 4: a face of its own
    with BuildSketch(Plane(origin=(0, 30, 0), x_dir=(1, 0, 0), z_dir=(0, 1, 0))):
        with BuildLine():
            Line((23.864017642, 16.318192841), (25.278231204, 17.732406403))
            ThreePointArc((25.278231204, 17.732406403), (25.278231204, 18.439513185), (24.571124423, 18.439513185))
            Line((24.571124423, 18.439513185), (23.15691086, 17.025299622))
            Line((23.15691086, 17.025299622), (21.742697298, 18.439513185))
            ThreePointArc((21.742697298, 18.439513185), (21.035590517, 18.439513185), (21.035590517, 17.732406403))
            Line((21.035590517, 17.732406403), (22.449804079, 16.318192841))
            Line((22.449804079, 16.318192841), (21.035590517, 14.903979279))
            ThreePointArc((21.035590517, 14.903979279), (21.035590517, 14.196872497), (21.742697298, 14.196872497))
            Line((21.742697298, 14.196872497), (23.15691086, 15.61108606))
            Line((23.15691086, 15.61108606), (24.571124423, 14.196872497))
            ThreePointArc((24.571124423, 14.196872497), (25.278231204, 14.196872497), (25.278231204, 14.903979279))
            Line((25.278231204, 14.903979279), (23.864017642, 16.318192841))
        make_face()
    extrude(amount=-CUT_EXTRUDE5_DEPTH, mode=Mode.SUBTRACT)

    # Sketch7 → Cut-Extrude6 (cut)
    with BuildSketch(Plane(origin=(0, 0, -51), x_dir=(-1, 0, 0), z_dir=(0, 0, -1))):
        with BuildLine():
            Line((-35.085, 23), (-8.585, 23))
            ThreePointArc((-8.585, 23), (-5.049466094, 21.535533906), (-3.585, 18))
            Line((-3.585, 18), (-3.585, 13))
            ThreePointArc((-3.585, 13), (-5.049466094, 9.464466094), (-8.585, 8))
            Line((-8.585, 8), (-35.085, 8))
            ThreePointArc((-35.085, 8), (-38.620533906, 9.464466094), (-40.085, 13))
            Line((-40.085, 13), (-40.085, 18))
            ThreePointArc((-40.085, 18), (-38.620533906, 21.535533906), (-35.085, 23))
        make_face()
    extrude(amount=-CUT_EXTRUDE6_DEPTH, mode=Mode.SUBTRACT)


solid = part.part
